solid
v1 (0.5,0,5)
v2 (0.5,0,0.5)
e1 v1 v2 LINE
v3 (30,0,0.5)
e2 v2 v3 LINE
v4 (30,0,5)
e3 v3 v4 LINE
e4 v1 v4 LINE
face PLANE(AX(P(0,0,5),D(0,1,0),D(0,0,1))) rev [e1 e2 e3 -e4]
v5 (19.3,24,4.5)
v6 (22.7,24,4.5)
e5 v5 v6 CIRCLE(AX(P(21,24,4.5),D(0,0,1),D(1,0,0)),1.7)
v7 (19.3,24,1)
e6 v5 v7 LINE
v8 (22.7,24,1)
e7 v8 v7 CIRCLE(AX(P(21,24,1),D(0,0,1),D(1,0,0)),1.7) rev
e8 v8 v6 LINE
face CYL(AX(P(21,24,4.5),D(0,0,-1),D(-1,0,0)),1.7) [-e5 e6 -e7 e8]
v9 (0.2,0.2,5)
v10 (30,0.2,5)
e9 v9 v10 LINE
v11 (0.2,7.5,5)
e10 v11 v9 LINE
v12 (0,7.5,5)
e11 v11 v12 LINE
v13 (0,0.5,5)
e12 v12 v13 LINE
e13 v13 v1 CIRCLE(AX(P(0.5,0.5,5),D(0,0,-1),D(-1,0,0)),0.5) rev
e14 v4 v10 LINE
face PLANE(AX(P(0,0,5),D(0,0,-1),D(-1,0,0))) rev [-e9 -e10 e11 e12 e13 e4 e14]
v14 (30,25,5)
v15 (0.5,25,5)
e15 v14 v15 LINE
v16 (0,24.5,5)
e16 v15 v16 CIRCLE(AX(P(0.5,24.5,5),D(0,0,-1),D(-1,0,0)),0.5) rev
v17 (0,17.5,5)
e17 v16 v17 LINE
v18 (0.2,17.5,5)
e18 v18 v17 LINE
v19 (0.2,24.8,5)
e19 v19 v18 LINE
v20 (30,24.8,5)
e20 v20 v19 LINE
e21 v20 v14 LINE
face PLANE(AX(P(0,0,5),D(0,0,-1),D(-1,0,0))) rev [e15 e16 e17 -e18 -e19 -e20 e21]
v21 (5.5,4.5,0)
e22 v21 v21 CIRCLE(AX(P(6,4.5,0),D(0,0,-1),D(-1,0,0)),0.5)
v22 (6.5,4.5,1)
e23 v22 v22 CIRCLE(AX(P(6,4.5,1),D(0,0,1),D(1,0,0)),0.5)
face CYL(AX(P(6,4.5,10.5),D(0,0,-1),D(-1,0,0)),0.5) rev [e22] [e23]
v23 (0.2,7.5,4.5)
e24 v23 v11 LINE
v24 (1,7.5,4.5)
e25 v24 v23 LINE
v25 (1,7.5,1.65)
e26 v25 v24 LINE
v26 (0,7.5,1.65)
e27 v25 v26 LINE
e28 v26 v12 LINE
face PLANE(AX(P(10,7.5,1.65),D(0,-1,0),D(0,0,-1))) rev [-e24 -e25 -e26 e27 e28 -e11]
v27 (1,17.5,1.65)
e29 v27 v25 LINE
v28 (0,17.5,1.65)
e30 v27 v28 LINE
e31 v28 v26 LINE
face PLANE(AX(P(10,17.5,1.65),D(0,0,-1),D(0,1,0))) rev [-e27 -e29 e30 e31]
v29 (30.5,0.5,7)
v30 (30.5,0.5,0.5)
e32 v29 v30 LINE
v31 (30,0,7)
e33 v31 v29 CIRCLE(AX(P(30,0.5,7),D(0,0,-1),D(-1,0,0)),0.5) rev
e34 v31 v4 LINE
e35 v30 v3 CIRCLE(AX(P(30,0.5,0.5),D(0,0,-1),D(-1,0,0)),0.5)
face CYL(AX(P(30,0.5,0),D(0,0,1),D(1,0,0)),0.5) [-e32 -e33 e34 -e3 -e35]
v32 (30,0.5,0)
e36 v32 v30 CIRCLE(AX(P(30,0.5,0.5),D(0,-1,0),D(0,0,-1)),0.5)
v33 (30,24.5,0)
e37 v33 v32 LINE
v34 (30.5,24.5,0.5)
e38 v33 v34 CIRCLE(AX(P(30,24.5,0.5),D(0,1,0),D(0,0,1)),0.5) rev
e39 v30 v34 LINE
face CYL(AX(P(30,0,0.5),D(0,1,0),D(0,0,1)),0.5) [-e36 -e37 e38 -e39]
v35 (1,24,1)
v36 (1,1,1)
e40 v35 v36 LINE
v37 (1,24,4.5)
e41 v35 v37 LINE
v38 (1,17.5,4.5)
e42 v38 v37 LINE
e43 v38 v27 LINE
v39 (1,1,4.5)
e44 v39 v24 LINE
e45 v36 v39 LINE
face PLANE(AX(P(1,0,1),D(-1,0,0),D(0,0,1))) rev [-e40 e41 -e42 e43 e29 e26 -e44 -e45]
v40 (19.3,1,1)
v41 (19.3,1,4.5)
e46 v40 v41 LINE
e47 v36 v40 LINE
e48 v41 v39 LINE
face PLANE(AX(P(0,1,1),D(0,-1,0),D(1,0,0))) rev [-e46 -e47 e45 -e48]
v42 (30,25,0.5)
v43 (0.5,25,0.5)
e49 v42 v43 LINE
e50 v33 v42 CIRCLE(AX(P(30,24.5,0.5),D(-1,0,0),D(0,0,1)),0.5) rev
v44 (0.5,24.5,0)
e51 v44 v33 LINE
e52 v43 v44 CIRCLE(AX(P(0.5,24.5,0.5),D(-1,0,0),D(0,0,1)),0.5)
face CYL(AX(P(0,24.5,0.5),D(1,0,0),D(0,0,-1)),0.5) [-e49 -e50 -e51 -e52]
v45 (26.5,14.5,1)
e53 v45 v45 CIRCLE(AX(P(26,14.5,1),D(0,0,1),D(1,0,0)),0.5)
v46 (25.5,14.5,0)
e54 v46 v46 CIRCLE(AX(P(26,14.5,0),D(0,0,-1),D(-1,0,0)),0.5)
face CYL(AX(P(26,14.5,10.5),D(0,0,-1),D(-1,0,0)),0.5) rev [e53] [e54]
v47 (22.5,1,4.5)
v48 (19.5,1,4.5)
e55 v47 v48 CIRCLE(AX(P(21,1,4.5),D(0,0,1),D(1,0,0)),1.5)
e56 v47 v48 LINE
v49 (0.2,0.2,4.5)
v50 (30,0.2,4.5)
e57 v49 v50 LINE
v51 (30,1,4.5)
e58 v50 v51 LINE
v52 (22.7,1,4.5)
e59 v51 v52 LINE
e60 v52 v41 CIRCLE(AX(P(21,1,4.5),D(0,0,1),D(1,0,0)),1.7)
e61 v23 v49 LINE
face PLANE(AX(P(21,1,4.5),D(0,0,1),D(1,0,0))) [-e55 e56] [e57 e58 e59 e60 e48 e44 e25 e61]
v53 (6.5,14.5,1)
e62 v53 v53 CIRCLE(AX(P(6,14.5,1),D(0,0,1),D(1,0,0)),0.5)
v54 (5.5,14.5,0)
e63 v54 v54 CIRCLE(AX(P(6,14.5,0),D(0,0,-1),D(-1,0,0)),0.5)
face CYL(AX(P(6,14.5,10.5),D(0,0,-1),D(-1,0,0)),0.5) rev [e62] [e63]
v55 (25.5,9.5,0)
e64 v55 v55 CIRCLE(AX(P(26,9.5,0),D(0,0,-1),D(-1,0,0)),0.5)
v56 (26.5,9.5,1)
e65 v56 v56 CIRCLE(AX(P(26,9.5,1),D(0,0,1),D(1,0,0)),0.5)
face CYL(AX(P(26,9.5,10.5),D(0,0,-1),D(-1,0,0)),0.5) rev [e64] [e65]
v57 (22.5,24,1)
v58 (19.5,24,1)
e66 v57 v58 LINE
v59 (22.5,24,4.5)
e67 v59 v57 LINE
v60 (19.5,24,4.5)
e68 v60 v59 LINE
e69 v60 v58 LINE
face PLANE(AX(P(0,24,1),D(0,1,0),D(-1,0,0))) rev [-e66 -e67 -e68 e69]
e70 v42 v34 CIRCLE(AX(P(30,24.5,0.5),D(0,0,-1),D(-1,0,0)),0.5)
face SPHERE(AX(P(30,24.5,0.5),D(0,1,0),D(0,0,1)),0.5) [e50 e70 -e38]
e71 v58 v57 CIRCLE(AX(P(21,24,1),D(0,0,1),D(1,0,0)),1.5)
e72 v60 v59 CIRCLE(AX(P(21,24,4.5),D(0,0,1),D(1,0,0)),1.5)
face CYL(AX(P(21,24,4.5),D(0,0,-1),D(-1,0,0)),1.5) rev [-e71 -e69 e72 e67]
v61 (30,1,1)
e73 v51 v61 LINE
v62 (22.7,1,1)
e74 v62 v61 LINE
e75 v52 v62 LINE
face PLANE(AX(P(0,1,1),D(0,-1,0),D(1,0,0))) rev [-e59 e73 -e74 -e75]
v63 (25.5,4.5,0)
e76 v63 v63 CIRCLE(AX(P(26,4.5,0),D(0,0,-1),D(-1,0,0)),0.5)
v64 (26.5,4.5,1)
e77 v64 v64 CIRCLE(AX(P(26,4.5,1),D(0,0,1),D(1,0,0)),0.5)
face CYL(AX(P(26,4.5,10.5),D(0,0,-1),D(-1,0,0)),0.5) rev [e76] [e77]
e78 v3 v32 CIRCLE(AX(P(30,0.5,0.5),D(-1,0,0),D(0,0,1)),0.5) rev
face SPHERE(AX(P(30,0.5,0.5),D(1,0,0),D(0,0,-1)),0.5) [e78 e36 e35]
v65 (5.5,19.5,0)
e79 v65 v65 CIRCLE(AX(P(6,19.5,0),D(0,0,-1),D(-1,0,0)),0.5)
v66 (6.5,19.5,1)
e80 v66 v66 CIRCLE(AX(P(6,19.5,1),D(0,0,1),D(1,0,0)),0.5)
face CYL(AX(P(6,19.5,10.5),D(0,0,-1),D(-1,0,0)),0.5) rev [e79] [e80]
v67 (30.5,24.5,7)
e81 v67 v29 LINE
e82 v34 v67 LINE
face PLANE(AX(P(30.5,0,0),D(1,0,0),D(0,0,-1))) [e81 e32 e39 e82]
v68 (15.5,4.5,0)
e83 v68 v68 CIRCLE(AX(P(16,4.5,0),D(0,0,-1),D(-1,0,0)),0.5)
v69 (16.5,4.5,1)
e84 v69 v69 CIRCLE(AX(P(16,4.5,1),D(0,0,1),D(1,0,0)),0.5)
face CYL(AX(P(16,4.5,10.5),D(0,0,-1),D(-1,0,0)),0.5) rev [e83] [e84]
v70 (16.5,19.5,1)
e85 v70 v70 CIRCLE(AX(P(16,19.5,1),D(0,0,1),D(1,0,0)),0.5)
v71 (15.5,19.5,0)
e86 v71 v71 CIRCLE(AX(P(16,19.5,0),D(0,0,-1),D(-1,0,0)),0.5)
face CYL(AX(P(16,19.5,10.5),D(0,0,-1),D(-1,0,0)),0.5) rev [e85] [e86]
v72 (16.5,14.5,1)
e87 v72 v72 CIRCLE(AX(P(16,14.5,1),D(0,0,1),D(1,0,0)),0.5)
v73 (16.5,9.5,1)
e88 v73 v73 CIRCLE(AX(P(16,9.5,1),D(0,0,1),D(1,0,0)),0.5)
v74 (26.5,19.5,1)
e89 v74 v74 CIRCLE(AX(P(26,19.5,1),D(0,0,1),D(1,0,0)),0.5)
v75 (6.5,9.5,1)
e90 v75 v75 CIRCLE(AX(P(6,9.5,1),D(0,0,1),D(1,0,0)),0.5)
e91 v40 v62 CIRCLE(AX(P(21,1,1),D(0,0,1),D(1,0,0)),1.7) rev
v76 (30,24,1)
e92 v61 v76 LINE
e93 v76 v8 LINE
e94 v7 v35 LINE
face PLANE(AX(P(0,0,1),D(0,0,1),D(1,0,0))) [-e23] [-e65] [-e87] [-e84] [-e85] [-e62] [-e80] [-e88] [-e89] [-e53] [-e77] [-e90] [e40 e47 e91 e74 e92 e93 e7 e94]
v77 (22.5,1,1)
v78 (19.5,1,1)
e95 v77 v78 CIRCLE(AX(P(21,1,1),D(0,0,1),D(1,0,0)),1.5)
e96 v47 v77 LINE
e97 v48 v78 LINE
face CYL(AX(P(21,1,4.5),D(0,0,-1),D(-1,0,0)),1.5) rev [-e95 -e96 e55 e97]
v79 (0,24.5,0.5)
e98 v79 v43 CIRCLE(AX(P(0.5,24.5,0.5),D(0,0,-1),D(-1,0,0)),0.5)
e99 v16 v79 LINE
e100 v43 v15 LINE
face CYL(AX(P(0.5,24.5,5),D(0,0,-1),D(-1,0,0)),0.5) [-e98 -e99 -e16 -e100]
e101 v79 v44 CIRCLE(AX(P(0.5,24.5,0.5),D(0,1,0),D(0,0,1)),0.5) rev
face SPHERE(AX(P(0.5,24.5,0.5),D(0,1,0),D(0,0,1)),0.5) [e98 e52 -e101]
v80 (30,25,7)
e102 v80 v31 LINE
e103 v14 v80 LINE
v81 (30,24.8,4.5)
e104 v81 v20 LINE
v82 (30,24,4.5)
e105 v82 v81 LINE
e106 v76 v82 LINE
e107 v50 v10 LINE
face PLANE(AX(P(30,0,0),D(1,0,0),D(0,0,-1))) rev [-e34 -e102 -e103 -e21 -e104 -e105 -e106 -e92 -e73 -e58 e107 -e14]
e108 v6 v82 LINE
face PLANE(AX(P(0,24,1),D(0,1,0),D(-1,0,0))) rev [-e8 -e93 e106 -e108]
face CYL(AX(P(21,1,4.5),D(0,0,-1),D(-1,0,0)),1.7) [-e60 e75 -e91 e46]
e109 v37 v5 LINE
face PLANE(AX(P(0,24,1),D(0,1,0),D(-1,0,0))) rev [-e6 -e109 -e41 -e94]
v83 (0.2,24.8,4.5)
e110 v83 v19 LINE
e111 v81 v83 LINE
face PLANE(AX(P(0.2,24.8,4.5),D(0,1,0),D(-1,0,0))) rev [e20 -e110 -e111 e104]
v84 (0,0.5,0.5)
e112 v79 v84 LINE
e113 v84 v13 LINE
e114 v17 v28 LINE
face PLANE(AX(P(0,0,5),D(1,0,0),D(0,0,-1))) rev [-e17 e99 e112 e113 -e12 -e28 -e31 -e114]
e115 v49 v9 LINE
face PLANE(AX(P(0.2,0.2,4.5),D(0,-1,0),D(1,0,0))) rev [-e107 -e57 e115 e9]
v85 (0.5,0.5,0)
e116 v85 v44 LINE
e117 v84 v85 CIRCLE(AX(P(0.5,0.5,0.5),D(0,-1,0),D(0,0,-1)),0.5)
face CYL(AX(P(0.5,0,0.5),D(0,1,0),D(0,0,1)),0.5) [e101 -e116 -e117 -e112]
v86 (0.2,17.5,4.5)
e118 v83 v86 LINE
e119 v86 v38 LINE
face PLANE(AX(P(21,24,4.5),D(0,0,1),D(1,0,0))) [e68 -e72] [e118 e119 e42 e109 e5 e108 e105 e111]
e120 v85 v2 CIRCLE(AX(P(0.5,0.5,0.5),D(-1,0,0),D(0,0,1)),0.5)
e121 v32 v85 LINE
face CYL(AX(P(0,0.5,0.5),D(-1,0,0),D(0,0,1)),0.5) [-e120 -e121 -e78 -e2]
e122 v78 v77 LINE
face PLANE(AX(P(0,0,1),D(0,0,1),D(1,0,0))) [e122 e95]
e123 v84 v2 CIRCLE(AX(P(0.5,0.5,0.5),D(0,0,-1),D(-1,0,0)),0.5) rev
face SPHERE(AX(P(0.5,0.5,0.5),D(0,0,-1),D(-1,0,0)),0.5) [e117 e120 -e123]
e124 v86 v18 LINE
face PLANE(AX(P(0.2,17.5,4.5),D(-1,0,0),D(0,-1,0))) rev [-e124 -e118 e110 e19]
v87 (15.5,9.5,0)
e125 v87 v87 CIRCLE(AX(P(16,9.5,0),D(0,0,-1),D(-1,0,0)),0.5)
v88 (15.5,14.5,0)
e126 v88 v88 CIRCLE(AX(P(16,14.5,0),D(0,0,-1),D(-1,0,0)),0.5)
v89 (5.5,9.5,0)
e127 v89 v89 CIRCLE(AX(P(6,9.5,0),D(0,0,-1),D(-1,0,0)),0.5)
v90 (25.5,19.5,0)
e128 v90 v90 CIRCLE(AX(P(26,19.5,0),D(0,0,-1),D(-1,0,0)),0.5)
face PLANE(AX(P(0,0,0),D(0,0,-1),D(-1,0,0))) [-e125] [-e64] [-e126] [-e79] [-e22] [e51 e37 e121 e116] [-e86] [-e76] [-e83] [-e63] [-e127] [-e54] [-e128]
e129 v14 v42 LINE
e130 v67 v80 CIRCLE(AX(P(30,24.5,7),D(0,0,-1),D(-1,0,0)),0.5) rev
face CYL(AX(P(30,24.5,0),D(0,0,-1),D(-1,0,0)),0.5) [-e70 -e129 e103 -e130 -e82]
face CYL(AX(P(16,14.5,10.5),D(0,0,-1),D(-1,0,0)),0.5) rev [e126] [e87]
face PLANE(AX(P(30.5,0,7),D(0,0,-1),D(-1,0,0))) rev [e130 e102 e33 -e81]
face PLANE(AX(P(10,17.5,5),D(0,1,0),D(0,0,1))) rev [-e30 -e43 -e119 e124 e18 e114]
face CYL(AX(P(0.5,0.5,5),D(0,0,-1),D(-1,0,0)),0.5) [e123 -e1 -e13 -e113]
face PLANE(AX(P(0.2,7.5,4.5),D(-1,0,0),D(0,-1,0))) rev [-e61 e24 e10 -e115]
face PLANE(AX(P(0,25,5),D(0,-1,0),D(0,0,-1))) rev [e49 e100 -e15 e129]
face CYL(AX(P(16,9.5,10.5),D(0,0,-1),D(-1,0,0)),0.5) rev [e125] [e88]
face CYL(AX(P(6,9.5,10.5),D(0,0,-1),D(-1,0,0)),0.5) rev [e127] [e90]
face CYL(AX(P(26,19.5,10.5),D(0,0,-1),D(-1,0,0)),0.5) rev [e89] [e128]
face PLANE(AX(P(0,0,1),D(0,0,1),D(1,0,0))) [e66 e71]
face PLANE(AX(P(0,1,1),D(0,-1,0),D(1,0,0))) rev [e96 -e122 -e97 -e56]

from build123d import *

# Parameters (mm, degrees)
ESQUISSE1_W             = 30
ESQUISSE1_H             = 25
BOSS_EXTRU_1_DEPTH      = 5
ESQUISSE2_W             = 28
ESQUISSE2_H             = 23
ENL_V_MAT_EXTRU_1_DEPTH = 4
ESQUISSE3_W             = 3.35
ESQUISSE3_H             = 10
ENL_V_MAT_EXTRU_2_DEPTH = 10
ESQUISSE4_W             = 4
ESQUISSE4_H             = 23
ENL_V_MAT_EXTRU_3_DEPTH = 10
BOSS_EXTRU_2_DEPTH      = 3.5
CONG_3_R                = 0.5
ENL_V_MAT_EXTRU_6_DEPTH = 0.5
ESQUISSE12_W            = 7
ESQUISSE12_H            = 25
BOSS_EXTRU_5_DEPTH      = 0.5
CONG_5_R                = 0.5
ESQUISSE13_R            = 0.5
ENL_V_MAT_EXTRU_8_DEPTH = 10.5


with BuildPart() as part:
    # Esquisse1 → Boss.-Extru.1 (new body)
    with BuildSketch(Plane.XY):
        with Locations((15, 12.5)):
            Rectangle(ESQUISSE1_W, ESQUISSE1_H)
    extrude(amount=BOSS_EXTRU_1_DEPTH)

    # Esquisse2 → Enlèv. mat.-Extru.1 (cut)
    with BuildSketch(Plane.XY.offset(5)):
        with Locations((15, 12.5)):
            Rectangle(ESQUISSE2_W, ESQUISSE2_H)
    extrude(amount=-ENL_V_MAT_EXTRU_1_DEPTH, mode=Mode.SUBTRACT)

    # Esquisse3 → Enlèv. mat.-Extru.2 (cut)
    with BuildSketch(Plane.ZY):
        with Locations((3.325, 12.5)):
            Rectangle(ESQUISSE3_W, ESQUISSE3_H)
    extrude(amount=-ENL_V_MAT_EXTRU_2_DEPTH, mode=Mode.SUBTRACT)

    # Esquisse4 → Enlèv. mat.-Extru.3 (cut)
    with BuildSketch(Plane(origin=(30, 0, 0), x_dir=(0, 0, -1), z_dir=(1, 0, 0))):
        with Locations((-3, 12.5)):
            Rectangle(ESQUISSE4_W, ESQUISSE4_H)
    extrude(amount=-ENL_V_MAT_EXTRU_3_DEPTH, mode=Mode.SUBTRACT)

    # Esquisse5 → Boss.-Extru.2 (add)
    # profile 1 of 2: a face of its own
    with BuildSketch(Plane.XY.offset(1)):
        with BuildLine():
            Line((19.311805698, 24.2), (22.688194302, 24.2))
            ThreePointArc((22.688194302, 24.2), (21, 22.3), (19.311805698, 24.2))
        make_face()
        with BuildLine():
            Line((19.5, 24), (22.5, 24))
            ThreePointArc((22.5, 24), (21, 22.5), (19.5, 24))
        make_face(mode=Mode.SUBTRACT)
    # profile 2 of 2: a face of its own
    with BuildSketch(Plane.XY.offset(1)):
        with BuildLine():
            Line((19.311805698, 0.8), (22.688194302, 0.8))
            ThreePointArc((22.688194302, 0.8), (21, 2.7), (19.311805698, 0.8))
        make_face()
        with BuildLine():
            Line((19.5, 1), (22.5, 1))
            ThreePointArc((22.5, 1), (21, 2.5), (19.5, 1))
        make_face(mode=Mode.SUBTRACT)
    extrude(amount=BOSS_EXTRU_2_DEPTH)

    # Congé3
    cong_3_edges = [part.edges().sort_by_distance(p)[0] for p in [
        (15, 25, 0),
        (15, 0, 0),
        (0, 12.5, 0),
        (0, 25, 2.5),
        (0, 0, 2.5),
    ]]
    fillet(cong_3_edges, radius=CONG_3_R)

    # Esquisse9 → Enlèv. mat.-Extru.6 (cut)
    with BuildSketch(Plane.XY.offset(5)):
        Polygon((0.2, 7.5), (0.2, 0.2), (30, 0.2), (30, 1), (1, 1), (1, 7.5), align=None)
        Polygon((1, 17.5), (0.2, 17.5), (0.2, 24.8), (30, 24.8), (30, 24), (1, 24), align=None)
    extrude(amount=-ENL_V_MAT_EXTRU_6_DEPTH, mode=Mode.SUBTRACT)

    # Esquisse12 → Boss.-Extru.5 (add)
    with BuildSketch(Plane(origin=(30, 0, 0), x_dir=(0, 0, -1), z_dir=(1, 0, 0))):
        with Locations((-3.5, 12.5)):
            Rectangle(ESQUISSE12_W, ESQUISSE12_H)
    extrude(amount=BOSS_EXTRU_5_DEPTH)

    # Congé5
    # the kernel refuses this fillet: 0.5 mm, written as the material it takes off along each edge
    with BuildSketch(Plane(origin=(30, 0.5, 0.5), x_dir=(0, 0, -1), z_dir=(0, -1, 0))) as cong_5_piece_1_section:
        Polygon((0, 0), (CONG_5_R * 1.02, 0), (CONG_5_R * 1.02, CONG_5_R * 1.02), (0, CONG_5_R * 1.02), align=None)
    cong_5_piece_1 = extrude(amount=CONG_5_R * 1.02, mode=Mode.PRIVATE)
    cong_5_piece_1 = cong_5_piece_1 - Plane(origin=(30, 0.5, 0.5), x_dir=(-0.7071067811865475, 0, 0.7071067811865475), z_dir=(0, -1, 0)) * Sphere(CONG_5_R, mode=Mode.PRIVATE)
    add(cong_5_piece_1, mode=Mode.SUBTRACT)
    with BuildSketch(Plane(origin=(30, 24.5, 0.5), x_dir=(1, 0, 0), z_dir=(0, 0, -1))) as cong_5_piece_2_section:
        Polygon((0, 0), (CONG_5_R * 1.02, 0), (CONG_5_R * 1.02, -CONG_5_R * 1.02), (0, -CONG_5_R * 1.02), align=None)
    cong_5_piece_2 = extrude(amount=CONG_5_R * 1.02, mode=Mode.PRIVATE)
    cong_5_piece_2 = cong_5_piece_2 - Plane(origin=(30, 24.5, 0.5), x_dir=(-0.7071067811865475, -0.7071067811865475, 0), z_dir=(0, 0, -1)) * Sphere(CONG_5_R, mode=Mode.PRIVATE)
    add(cong_5_piece_2, mode=Mode.SUBTRACT)
    with BuildSketch(Plane(origin=(30.5, 24.5, 0), x_dir=(-1, 0, 0), z_dir=(0, -1, 0))) as cong_5_piece_3:
        with BuildLine():
            CenterArc((CONG_5_R, -CONG_5_R), CONG_5_R, 90, 90)
            Line((0, -CONG_5_R), (0, 0))
            Line((0, 0), (CONG_5_R, 0))
        make_face()
    extrude(amount=24, mode=Mode.SUBTRACT)
    with BuildSketch(Plane(origin=(30.5, 25, 8.25), x_dir=(0, -1, 0), z_dir=(0, 0, -1))) as cong_5_piece_4:
        with BuildLine():
            CenterArc((CONG_5_R, CONG_5_R), CONG_5_R, 180, 90)
            Line((0, CONG_5_R), (0, 0))
            Line((0, 0), (CONG_5_R, 0))
        make_face()
    extrude(amount=7.75, mode=Mode.SUBTRACT)
    with BuildSketch(Plane(origin=(30.5, 0, 0.5), x_dir=(-1, 0, 0), z_dir=(0, 0, 1))) as cong_5_piece_5:
        with BuildLine():
            CenterArc((CONG_5_R, -CONG_5_R), CONG_5_R, 90, 90)
            Line((0, -CONG_5_R), (0, 0))
            Line((0, 0), (CONG_5_R, 0))
        make_face()
    extrude(amount=7.75, mode=Mode.SUBTRACT)

    # Esquisse13 → Enlèv. mat.-Extru.8 (cut)
    with BuildSketch(Plane(origin=(0, 0, 0), x_dir=(-1, 0, 0), z_dir=(0, 0, -1))):
        with Locations((-26, 19.5)):
            Circle(ESQUISSE13_R)
        with Locations((-16, 19.5)):
            Circle(ESQUISSE13_R)
        with Locations((-6, 19.5)):
            Circle(ESQUISSE13_R)
        with Locations((-16, 14.5)):
            Circle(ESQUISSE13_R)
        with Locations((-6, 14.5)):
            Circle(ESQUISSE13_R)
        with Locations((-16, 9.5)):
            Circle(ESQUISSE13_R)
        with Locations((-6, 9.5)):
            Circle(ESQUISSE13_R)
        with Locations((-16, 4.5)):
            Circle(ESQUISSE13_R)
        with Locations((-6, 4.5)):
            Circle(ESQUISSE13_R)
        with Locations((-26, 14.5)):
            Circle(ESQUISSE13_R)
        with Locations((-26, 9.5)):
            Circle(ESQUISSE13_R)
        with Locations((-26, 4.5)):
            Circle(ESQUISSE13_R)
    extrude(amount=-ENL_V_MAT_EXTRU_8_DEPTH, mode=Mode.SUBTRACT)


solid = part.part
